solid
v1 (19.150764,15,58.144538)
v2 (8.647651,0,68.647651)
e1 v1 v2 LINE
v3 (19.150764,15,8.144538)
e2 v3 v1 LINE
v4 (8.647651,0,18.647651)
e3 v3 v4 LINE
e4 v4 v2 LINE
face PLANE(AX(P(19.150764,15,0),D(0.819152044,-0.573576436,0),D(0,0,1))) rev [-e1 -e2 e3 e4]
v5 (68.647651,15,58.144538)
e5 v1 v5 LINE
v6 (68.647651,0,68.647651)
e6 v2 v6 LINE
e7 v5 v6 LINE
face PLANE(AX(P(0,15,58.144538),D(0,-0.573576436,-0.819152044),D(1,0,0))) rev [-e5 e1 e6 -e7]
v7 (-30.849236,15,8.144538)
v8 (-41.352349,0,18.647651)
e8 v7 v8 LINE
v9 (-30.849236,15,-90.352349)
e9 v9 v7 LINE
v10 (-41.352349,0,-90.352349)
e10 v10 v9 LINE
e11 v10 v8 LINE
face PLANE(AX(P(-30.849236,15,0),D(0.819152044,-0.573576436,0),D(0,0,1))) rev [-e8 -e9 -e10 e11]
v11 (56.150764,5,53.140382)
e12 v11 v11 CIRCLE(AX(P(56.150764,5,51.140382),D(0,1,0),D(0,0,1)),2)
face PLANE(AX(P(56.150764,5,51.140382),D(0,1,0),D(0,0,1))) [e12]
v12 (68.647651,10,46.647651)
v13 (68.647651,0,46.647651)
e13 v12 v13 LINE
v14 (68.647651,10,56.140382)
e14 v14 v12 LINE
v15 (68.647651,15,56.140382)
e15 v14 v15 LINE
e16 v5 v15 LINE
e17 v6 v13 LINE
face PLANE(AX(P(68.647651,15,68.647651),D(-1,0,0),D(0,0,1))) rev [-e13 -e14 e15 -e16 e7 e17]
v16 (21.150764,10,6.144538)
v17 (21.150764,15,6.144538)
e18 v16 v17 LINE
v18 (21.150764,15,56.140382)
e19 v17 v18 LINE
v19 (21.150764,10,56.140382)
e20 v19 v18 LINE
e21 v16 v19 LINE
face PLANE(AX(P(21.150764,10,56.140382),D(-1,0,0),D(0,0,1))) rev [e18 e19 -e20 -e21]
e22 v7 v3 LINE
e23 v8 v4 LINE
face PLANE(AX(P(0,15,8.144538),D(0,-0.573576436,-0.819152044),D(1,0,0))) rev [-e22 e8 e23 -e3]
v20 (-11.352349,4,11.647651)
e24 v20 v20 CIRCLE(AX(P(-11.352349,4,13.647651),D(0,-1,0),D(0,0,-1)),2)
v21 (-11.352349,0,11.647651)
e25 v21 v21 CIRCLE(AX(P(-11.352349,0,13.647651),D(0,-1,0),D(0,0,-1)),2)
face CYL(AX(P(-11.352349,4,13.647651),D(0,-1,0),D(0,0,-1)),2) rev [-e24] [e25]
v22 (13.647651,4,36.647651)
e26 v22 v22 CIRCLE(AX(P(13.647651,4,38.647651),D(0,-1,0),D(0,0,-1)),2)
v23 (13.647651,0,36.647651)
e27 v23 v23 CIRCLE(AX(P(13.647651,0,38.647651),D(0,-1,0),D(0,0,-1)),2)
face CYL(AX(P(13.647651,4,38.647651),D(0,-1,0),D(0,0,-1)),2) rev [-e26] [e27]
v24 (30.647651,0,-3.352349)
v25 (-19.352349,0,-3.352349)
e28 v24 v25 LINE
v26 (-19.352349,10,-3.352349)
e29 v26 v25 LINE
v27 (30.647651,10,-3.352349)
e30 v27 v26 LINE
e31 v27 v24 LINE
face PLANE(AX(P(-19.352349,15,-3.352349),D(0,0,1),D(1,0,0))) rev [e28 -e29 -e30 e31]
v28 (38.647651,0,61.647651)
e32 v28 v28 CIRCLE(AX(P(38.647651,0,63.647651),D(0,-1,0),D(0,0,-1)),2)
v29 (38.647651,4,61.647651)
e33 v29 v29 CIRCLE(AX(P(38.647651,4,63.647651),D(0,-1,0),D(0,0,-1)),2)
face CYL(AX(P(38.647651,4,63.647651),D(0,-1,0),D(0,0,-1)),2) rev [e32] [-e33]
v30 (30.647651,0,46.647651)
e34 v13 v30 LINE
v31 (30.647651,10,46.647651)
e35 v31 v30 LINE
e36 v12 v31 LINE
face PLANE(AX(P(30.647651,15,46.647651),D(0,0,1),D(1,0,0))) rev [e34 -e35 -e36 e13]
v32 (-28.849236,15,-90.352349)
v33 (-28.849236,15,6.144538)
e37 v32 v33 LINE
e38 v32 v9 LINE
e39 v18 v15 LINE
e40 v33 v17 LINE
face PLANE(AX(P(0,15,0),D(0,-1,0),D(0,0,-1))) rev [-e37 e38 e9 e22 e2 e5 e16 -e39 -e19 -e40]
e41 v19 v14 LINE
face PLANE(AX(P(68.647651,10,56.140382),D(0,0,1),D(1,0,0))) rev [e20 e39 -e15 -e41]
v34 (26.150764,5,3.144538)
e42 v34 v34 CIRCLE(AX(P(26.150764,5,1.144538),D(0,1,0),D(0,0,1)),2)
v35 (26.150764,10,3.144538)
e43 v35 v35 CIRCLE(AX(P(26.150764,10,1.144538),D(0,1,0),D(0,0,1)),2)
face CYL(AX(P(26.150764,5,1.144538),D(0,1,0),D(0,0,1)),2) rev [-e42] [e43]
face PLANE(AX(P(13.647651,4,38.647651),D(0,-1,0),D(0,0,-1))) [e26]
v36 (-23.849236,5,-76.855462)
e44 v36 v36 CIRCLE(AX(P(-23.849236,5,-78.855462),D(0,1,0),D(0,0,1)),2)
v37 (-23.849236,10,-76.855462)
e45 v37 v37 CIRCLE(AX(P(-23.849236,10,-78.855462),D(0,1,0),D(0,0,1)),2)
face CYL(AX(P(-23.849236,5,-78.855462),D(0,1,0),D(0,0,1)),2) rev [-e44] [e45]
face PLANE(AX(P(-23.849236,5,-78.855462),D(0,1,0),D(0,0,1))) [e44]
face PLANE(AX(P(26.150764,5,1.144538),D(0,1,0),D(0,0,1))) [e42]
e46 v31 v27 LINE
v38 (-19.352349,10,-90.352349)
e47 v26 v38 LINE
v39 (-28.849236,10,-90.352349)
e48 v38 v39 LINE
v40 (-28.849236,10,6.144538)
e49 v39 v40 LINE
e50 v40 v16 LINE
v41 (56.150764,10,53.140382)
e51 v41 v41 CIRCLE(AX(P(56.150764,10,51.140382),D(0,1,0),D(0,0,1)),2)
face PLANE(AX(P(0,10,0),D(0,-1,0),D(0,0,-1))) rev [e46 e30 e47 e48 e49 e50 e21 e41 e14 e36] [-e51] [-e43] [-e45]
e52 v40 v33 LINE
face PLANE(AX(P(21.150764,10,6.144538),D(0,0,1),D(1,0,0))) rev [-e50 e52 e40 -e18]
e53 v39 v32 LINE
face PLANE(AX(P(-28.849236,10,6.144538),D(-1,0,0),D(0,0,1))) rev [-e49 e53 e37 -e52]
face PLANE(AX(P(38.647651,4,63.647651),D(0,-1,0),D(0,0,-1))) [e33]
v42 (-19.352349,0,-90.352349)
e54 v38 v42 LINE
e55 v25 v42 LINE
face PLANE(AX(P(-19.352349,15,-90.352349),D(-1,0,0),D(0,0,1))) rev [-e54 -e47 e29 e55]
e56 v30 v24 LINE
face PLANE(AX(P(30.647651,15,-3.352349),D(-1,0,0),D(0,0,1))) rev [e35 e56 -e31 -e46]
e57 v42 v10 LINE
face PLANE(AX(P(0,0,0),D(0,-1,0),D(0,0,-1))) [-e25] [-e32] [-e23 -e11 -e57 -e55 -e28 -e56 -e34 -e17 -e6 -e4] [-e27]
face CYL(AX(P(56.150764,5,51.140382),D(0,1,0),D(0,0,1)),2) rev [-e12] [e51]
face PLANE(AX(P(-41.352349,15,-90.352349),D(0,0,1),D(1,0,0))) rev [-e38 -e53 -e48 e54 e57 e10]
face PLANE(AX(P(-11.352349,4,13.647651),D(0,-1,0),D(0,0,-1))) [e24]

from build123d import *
from OCP.BRepFilletAPI import BRepFilletAPI_MakeChamfer

# Parameters (mm, degrees)
BOSS_EXTRU_1_DEPTH      = 15
CHANFREIN1_SIZE         = 10.503113073
CHANFREIN1_SIZE_2       = 15
ESQUISSE4_R             = 2
ENL_V_MAT_EXTRU_3_DEPTH = 4
ENL_V_MAT_EXTRU_5_DEPTH = 5
ESQUISSE6_R             = 2
ENL_V_MAT_EXTRU_6_DEPTH = 5


with BuildPart() as part:
    # Esquisse1 → Boss.-Extru.1 (new body)
    with BuildSketch(Plane(origin=(0, 0, 0), x_dir=(1, 0, 0), z_dir=(0, 1, 0))):
        Polygon((-41.352348911, -18.647651089), (8.647651089, -18.647651089), (8.647651089, -68.647651089), (68.647651089, -68.647651089), (68.647651089, -46.647651089), (30.647651089, -46.647651089), (30.647651089, 3.352348911), (-19.352348911, 3.352348911), (-19.352348911, 41.352348911), (-19.352348911, 90.352348911), (-41.352348911, 90.352348911), (-41.352348911, 41.352348911), align=None)
    extrude(amount=BOSS_EXTRU_1_DEPTH)

    # Chanfrein1
    chanfrein1_edges_1 = [part.edges().sort_by_distance(p)[0] for p in [
        (38.647651089, 15, 68.647651089),
    ]]
    chanfrein1_side_1 = [part.faces().sort_by_distance(p)[0] for p in [
        (38.647651089, 15, 68.437588827),
    ]]
    chanfrein1_edges_2 = [part.edges().sort_by_distance(p)[0] for p in [
        (8.647651089, 15, 43.647651089),
    ]]
    chanfrein1_side_2 = [part.faces().sort_by_distance(p)[0] for p in [
        (8.85771335, 15, 43.647651089),
    ]]
    chanfrein1_edges_3 = [part.edges().sort_by_distance(p)[0] for p in [
        (-16.352348911, 15, 18.647651089),
    ]]
    chanfrein1_side_3 = [part.faces().sort_by_distance(p)[0] for p in [
        (-16.352348911, 14.789937739, 18.647651089),
    ]]
    chanfrein1_edges_4 = [part.edges().sort_by_distance(p)[0] for p in [
        (-41.352348911, 15, -35.852348911),
    ]]
    chanfrein1_side_4 = [part.faces().sort_by_distance(p)[0] for p in [
        (-41.14228665, 15, -35.852348911),
    ]]
    chanfrein1 = BRepFilletAPI_MakeChamfer(part.part.solid().wrapped)
    for e in chanfrein1_edges_1:
        chanfrein1.Add(CHANFREIN1_SIZE - 0.0001, CHANFREIN1_SIZE_2 - 0.0001, e.wrapped, chanfrein1_side_1[0].wrapped)
    for e in chanfrein1_edges_2:
        chanfrein1.Add(CHANFREIN1_SIZE - 0.0001, CHANFREIN1_SIZE_2 - 0.0001, e.wrapped, chanfrein1_side_2[0].wrapped)
    for e in chanfrein1_edges_3:
        chanfrein1.Add(CHANFREIN1_SIZE_2 - 0.0001, CHANFREIN1_SIZE - 0.0001, e.wrapped, chanfrein1_side_3[0].wrapped)
    for e in chanfrein1_edges_4:
        chanfrein1.Add(CHANFREIN1_SIZE - 0.0001, CHANFREIN1_SIZE_2 - 0.0001, e.wrapped, chanfrein1_side_4[0].wrapped)
    add(Compound.cast(chanfrein1.Shape()), mode=Mode.REPLACE)  # a hair under: the kernel refuses the full size

    # Esquisse4 → Enlèv. mat.-Extru.3 (cut)
    with BuildSketch(Plane.XZ):
        with Locations(Location((38.647651089, 63.647651089, 0), (0, 0, 270))):
            Circle(ESQUISSE4_R)
        with Locations(Location((13.647651089, 38.647651089, 0), (0, 0, 270))):
            Circle(ESQUISSE4_R)
        with Locations(Location((-11.352348911, 13.647651089, 0), (0, 0, 270))):
            Circle(ESQUISSE4_R)
    extrude(amount=-ENL_V_MAT_EXTRU_3_DEPTH, mode=Mode.SUBTRACT)

    # Esquisse5 → Enlèv. mat.-Extru.5 (cut)
    with BuildSketch(Plane(origin=(0, 15, 0), x_dir=(1, 0, 0), z_dir=(0, 1, 0))):
        Polygon((-19.352348911, 3.352348911), (30.647651089, 3.352348911), (30.647651089, -46.647651089), (68.647651089, -46.647651089), (68.647651089, -56.140382231), (21.150764162, -56.140382231), (21.150764162, -6.144538016), (-28.849235838, -6.144538016), (-28.849235838, 90.352348911), (-19.352348911, 90.352348911), align=None)
    extrude(amount=-ENL_V_MAT_EXTRU_5_DEPTH, mode=Mode.SUBTRACT)

    # Esquisse6 → Enlèv. mat.-Extru.6 (cut)
    with BuildSketch(Plane(origin=(0, 10, 0), x_dir=(1, 0, 0), z_dir=(0, 1, 0))):
        with Locations(Location((-23.849235838, 78.855461984, 0), (0, 0, 270))):
            Circle(ESQUISSE6_R)
        with Locations(Location((26.150764162, -1.144538016, 0), (0, 0, 270))):
            Circle(ESQUISSE6_R)
        with Locations(Location((56.150764162, -51.140382231, 0), (0, 0, 270))):
            Circle(ESQUISSE6_R)
    extrude(amount=-ENL_V_MAT_EXTRU_6_DEPTH, mode=Mode.SUBTRACT)


solid = part.part
